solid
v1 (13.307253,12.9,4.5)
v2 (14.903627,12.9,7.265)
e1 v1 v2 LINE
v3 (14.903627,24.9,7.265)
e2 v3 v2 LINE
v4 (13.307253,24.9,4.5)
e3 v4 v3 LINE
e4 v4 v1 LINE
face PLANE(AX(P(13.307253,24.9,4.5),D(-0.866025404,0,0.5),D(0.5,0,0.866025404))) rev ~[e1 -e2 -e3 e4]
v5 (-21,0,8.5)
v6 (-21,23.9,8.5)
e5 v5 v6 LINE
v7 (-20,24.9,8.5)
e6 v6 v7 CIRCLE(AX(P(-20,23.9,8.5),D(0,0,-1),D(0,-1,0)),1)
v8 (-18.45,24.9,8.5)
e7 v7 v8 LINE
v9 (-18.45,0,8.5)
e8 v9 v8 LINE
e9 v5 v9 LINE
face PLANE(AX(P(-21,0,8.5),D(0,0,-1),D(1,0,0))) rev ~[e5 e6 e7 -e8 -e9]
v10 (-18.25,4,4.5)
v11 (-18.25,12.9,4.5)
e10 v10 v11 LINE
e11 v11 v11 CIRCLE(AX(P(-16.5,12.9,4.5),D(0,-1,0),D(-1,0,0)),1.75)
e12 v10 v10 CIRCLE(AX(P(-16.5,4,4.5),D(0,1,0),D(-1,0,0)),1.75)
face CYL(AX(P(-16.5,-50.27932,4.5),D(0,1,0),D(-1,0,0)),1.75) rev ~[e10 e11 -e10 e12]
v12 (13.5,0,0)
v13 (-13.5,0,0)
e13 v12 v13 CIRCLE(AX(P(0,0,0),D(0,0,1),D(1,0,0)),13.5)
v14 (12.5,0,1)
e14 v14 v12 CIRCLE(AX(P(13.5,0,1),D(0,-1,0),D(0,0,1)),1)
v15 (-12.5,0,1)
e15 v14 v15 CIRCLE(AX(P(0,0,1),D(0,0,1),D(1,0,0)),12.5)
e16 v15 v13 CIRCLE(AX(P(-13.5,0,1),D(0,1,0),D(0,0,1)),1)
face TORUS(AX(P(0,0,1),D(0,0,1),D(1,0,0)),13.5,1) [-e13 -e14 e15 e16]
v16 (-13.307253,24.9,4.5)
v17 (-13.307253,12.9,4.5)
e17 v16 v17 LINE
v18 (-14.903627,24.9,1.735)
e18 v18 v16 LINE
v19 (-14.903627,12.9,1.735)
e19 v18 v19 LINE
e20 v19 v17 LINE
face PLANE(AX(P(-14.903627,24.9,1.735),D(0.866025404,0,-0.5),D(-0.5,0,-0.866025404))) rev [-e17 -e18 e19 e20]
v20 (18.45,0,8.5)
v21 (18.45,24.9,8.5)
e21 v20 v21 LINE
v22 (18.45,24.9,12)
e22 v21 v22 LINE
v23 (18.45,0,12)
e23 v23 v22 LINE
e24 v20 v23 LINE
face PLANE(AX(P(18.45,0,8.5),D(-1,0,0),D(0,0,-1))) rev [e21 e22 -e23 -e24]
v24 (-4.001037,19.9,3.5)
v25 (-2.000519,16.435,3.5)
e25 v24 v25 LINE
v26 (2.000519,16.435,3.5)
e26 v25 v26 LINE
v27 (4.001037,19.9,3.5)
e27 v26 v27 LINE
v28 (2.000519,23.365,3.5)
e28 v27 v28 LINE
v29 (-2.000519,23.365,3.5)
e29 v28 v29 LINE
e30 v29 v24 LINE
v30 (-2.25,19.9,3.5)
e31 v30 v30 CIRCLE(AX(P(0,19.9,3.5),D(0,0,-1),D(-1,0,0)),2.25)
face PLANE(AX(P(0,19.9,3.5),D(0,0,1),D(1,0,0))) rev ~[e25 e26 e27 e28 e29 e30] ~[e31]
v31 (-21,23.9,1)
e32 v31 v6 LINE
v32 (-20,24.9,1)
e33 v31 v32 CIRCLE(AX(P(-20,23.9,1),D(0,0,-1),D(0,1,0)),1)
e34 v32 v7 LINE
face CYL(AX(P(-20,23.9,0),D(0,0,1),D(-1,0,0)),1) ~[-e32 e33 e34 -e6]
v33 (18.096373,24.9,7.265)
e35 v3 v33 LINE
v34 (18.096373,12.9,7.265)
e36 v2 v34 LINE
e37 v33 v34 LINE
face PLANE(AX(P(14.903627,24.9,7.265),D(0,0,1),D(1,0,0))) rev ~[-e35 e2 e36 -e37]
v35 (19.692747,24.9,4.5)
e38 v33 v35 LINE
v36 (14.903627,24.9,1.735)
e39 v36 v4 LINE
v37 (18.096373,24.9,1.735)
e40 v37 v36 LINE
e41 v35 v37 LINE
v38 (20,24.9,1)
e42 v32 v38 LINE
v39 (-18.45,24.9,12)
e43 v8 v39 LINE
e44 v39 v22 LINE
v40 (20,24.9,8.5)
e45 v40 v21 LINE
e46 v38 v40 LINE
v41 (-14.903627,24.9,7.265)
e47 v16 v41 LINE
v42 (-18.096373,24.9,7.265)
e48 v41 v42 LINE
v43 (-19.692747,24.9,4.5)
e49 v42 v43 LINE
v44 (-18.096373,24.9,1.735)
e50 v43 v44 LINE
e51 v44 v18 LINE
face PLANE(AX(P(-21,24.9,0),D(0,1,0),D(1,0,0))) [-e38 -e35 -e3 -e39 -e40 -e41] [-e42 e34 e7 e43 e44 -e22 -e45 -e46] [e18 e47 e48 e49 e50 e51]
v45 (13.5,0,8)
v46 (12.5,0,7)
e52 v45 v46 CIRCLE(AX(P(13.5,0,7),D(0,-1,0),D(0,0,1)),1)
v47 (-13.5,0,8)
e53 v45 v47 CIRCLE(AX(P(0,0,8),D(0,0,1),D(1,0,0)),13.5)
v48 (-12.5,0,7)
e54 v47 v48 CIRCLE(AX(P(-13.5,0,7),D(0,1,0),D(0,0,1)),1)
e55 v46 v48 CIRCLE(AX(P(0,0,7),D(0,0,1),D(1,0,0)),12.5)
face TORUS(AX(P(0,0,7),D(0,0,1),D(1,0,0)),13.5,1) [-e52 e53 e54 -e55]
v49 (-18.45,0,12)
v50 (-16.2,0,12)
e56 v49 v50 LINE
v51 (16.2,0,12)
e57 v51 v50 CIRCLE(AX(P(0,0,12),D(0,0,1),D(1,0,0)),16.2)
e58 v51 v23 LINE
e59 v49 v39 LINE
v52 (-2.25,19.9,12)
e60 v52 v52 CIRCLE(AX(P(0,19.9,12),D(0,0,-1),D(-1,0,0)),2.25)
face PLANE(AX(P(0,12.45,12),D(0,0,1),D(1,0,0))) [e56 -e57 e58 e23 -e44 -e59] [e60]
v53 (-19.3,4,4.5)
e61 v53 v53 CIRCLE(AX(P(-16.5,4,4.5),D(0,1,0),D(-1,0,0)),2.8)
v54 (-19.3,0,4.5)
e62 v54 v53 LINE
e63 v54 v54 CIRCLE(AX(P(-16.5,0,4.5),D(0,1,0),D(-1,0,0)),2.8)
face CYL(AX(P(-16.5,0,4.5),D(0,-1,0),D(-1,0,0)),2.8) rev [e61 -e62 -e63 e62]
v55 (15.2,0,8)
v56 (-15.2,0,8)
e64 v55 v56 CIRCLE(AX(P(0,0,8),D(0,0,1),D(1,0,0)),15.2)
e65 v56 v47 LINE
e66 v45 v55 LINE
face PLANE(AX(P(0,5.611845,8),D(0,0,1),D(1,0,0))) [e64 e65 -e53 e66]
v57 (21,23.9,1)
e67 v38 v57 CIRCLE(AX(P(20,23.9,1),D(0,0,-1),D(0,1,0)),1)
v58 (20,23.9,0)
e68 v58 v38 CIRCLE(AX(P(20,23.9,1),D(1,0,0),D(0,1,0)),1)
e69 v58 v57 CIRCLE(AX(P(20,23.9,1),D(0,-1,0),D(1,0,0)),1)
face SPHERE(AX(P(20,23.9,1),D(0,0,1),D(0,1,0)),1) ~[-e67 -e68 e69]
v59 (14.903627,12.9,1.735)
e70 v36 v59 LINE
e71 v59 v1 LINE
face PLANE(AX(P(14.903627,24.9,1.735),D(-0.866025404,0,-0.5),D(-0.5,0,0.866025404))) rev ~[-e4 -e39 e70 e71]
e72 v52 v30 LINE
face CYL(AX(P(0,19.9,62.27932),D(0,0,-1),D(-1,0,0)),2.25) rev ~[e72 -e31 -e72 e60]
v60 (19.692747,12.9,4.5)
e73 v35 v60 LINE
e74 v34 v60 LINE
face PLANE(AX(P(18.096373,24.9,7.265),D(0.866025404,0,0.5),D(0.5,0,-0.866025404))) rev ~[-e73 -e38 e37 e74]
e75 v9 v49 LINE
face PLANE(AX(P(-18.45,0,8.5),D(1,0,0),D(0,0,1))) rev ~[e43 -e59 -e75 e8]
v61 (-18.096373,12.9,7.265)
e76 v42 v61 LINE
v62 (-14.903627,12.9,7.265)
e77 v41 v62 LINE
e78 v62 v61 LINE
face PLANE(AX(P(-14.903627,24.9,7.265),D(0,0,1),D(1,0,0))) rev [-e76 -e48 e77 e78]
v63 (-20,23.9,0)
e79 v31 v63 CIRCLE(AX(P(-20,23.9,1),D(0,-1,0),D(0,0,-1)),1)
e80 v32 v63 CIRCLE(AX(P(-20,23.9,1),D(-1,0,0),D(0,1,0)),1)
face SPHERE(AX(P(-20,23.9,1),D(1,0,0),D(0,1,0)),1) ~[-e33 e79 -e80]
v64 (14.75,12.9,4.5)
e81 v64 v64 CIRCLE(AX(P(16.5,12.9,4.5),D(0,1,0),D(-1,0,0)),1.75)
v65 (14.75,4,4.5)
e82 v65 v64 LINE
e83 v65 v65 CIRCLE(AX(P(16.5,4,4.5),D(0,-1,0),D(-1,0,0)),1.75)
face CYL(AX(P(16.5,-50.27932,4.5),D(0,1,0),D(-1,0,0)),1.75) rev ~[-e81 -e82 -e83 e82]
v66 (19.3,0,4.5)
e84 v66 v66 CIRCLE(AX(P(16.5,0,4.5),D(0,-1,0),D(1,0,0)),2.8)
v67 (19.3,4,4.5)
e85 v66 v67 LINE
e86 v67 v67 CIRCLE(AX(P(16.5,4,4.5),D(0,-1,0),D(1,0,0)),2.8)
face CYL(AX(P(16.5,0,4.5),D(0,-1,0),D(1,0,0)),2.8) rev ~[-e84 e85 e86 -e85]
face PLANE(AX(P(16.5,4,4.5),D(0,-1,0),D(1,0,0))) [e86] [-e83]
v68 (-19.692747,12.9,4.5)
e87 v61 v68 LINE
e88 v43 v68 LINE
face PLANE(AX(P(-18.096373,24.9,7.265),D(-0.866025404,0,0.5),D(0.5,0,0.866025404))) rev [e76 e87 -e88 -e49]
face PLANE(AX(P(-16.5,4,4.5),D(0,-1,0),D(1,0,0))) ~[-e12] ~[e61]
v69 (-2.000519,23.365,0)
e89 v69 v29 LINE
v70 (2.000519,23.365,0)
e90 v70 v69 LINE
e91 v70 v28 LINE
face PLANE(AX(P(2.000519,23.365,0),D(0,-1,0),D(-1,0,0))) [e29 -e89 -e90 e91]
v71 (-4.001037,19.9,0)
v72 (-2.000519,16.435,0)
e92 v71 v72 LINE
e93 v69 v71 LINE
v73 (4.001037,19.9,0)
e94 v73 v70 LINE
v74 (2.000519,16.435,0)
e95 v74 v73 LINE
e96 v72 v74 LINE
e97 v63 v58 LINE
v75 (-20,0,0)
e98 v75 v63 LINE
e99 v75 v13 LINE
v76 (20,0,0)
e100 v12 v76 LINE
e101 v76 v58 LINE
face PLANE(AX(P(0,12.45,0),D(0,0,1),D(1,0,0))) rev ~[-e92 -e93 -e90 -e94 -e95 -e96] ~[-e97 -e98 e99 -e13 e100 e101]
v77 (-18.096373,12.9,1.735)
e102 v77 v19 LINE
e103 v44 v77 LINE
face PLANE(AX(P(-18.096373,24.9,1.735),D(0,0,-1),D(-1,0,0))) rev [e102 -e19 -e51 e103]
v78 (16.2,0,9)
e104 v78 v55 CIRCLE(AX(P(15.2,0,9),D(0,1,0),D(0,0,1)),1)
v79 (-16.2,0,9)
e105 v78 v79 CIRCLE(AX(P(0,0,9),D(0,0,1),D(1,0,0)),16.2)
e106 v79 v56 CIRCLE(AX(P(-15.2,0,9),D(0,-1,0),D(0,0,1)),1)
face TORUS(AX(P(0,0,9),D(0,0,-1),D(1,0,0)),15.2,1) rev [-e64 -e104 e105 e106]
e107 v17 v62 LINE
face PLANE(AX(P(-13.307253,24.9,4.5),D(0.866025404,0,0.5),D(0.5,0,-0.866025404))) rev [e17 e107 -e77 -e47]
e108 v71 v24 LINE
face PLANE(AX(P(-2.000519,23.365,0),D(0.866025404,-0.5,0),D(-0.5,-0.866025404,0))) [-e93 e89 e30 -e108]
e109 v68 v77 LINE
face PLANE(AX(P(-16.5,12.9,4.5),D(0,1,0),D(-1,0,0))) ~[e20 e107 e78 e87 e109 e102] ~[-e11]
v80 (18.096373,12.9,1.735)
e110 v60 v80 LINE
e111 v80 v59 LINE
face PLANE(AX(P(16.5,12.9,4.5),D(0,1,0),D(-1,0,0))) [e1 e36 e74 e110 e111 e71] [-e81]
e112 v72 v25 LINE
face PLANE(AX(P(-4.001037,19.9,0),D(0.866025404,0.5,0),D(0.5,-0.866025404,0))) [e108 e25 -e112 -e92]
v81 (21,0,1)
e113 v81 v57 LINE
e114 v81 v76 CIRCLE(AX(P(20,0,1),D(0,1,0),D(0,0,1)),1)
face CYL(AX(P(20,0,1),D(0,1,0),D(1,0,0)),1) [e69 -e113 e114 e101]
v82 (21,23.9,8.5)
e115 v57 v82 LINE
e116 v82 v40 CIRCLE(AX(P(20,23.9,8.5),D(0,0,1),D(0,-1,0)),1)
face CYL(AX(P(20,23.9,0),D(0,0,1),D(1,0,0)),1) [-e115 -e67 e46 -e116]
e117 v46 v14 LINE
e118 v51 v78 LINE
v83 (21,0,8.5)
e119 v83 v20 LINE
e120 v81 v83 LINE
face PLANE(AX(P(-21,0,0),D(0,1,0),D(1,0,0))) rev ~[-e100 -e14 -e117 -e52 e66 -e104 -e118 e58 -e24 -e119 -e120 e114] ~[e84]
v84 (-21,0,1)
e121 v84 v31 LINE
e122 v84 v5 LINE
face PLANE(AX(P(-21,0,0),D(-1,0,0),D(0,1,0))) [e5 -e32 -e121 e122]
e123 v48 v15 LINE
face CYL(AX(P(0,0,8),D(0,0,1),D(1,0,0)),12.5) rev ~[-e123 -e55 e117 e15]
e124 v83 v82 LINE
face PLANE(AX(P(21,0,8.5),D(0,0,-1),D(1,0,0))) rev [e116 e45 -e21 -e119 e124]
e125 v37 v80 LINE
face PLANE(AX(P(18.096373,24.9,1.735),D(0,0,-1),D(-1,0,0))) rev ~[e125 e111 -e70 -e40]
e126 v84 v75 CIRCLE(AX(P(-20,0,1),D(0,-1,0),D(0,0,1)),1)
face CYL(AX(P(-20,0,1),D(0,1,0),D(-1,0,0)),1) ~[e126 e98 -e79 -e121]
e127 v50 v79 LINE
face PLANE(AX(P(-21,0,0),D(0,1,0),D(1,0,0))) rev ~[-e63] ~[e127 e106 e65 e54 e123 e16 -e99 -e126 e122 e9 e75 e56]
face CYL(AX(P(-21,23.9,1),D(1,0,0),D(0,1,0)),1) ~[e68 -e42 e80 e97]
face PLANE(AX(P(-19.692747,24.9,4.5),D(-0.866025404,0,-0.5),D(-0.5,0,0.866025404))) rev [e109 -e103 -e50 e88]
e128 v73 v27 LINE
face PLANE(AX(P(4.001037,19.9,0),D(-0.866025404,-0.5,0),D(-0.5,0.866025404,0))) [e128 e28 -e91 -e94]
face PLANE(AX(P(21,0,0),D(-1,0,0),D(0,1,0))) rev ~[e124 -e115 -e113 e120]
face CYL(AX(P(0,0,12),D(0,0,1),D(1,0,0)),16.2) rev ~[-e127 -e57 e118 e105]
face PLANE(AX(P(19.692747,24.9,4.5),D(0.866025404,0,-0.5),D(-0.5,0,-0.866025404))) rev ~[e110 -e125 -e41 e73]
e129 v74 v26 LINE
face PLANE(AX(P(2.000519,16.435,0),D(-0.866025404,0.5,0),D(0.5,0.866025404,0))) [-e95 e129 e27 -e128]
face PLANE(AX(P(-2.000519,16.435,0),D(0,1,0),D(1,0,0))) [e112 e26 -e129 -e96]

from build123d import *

# Parameters (mm, degrees)
F0_W      = 42
F0_H      = 24.9
F1_DEPTH  = 12
F3_DEPTH  = 4
F5_DEPTH  = 8
F7_D      = 4.5
F8_W      = 2.55
F8_H      = 3.5
F9_DEPTH  = 24.9
F12_D     = 3.5
F14_DEPTH = 3.5
F15_R     = 2.8
F15_R_2   = 1.75
F16_DEPTH = 4
F17_R     = 1.75
F18_DEPTH = 12
F19_R     = 1


# Not quite as in the source:
# - a pattern or mirror of a feature is missing from the dataset's text; its kind, count and spacing are read off the source's solid


with BuildPart() as f1:
    # F0 (on Top) → F1 (new body)
    with BuildSketch(Plane.XY):
        with Locations((0, 12.45)):
            Rectangle(F0_W, F0_H)
    extrude(amount=F1_DEPTH)

    # F2 (on face) → F3 (cut)
    with BuildSketch(Plane.XY.offset(12)):
        with BuildLine():
            Line((-16.2, 0), (16.2, 0))
            ThreePointArc((16.2, 0), (0, 16.2), (-16.2, 0))
        make_face()
    extrude(amount=-F3_DEPTH, mode=Mode.SUBTRACT)

    # F4 (on face) → F5 (cut, through all)
    with BuildSketch(Plane.XY.offset(8)):
        with BuildLine():
            Line((-12.5, 0), (12.5, 0))
            ThreePointArc((12.5, 0), (0, 12.5), (-12.5, 0))
        make_face()
    extrude(amount=-F5_DEPTH, mode=Mode.SUBTRACT)

    # F7 (through all)
    with Locations(Plane.XY.offset(12)):
        with Locations((0, 19.9)):
            Hole(F7_D / 2)

    # F8 (on face) → F9 (cut, through all)
    with BuildSketch(Plane.XZ):
        with Locations((-19.725, 10.25)):
            Rectangle(F8_W, F8_H)
    f9 = extrude(amount=-F9_DEPTH, mode=Mode.SUBTRACT)

    # F9_copies: F9 across plane
    add(f9.mirror(Plane(origin=(0, 0, 0), x_dir=(0, 0, 1), z_dir=(1, 0, 0))), mode=Mode.SUBTRACT)

    # F12 (through all)
    with Locations(Plane.XZ):
        with Locations((-16.5, 4.5), (16.5, 4.5)):
            Hole(F12_D / 2)

    # F13 (on face) → F14 (cut)
    with BuildSketch(Plane.XY):
        Polygon((-2.0005186827, 23.365), (-4.0010373655, 19.9), (-2.0005186827, 16.435), (2.0005186827, 16.435), (4.0010373655, 19.9), (2.0005186827, 23.365), align=None)
    extrude(amount=F14_DEPTH, mode=Mode.SUBTRACT)

    # F15 (on face) → F16 (cut)
    with BuildSketch(Plane.XZ):
        with Locations((16.5, 4.5)):
            Circle(F15_R)
        with Locations((16.5, 4.5)):
            Circle(F15_R_2, mode=Mode.SUBTRACT)
    f16 = extrude(amount=-F16_DEPTH, mode=Mode.SUBTRACT)

    # F16_copies: F16 across plane
    add(f16.mirror(Plane(origin=(0, 0, 0), x_dir=(0, 0, -1), z_dir=(-1, 0, 0))), mode=Mode.SUBTRACT)

    # F17 (on face) → F18 (cut)
    with BuildSketch(Plane(origin=(0, 24.9, 0), x_dir=(-1, 0, 0), z_dir=(0, 1, 0))):
        Polygon((-19.6927469886, 4.5), (-18.0963734943, 1.735), (-14.9036265057, 1.735), (-13.3072530114, 4.5), (-14.9036265057, 7.265), (-18.0963734943, 7.265), align=None)
        with Locations((-16.5, 4.5)):
            Circle(F17_R, mode=Mode.SUBTRACT)
    f18 = extrude(amount=-F18_DEPTH, mode=Mode.SUBTRACT)

    # F18_copies: F18 across plane
    add(f18.mirror(Plane(origin=(0, 0, 0), x_dir=(0, 0, -1), z_dir=(-1, 0, 0))), mode=Mode.SUBTRACT)

    # F19
    f19_edges = [f1.edges().sort_by_distance(p)[0] for p in [
        (21, 24.9, 4.25),
        (0, 24.9, 0),
        (-21, 24.9, 4.25),
        (-21, 12.45, 0),
        (21, 12.45, 0),
        (0, 12.5, 0),
        (0, 12.5, 8),
        (0, 16.2, 8),
    ]]
    fillet(f19_edges, radius=F19_R)


solid = f1.part
